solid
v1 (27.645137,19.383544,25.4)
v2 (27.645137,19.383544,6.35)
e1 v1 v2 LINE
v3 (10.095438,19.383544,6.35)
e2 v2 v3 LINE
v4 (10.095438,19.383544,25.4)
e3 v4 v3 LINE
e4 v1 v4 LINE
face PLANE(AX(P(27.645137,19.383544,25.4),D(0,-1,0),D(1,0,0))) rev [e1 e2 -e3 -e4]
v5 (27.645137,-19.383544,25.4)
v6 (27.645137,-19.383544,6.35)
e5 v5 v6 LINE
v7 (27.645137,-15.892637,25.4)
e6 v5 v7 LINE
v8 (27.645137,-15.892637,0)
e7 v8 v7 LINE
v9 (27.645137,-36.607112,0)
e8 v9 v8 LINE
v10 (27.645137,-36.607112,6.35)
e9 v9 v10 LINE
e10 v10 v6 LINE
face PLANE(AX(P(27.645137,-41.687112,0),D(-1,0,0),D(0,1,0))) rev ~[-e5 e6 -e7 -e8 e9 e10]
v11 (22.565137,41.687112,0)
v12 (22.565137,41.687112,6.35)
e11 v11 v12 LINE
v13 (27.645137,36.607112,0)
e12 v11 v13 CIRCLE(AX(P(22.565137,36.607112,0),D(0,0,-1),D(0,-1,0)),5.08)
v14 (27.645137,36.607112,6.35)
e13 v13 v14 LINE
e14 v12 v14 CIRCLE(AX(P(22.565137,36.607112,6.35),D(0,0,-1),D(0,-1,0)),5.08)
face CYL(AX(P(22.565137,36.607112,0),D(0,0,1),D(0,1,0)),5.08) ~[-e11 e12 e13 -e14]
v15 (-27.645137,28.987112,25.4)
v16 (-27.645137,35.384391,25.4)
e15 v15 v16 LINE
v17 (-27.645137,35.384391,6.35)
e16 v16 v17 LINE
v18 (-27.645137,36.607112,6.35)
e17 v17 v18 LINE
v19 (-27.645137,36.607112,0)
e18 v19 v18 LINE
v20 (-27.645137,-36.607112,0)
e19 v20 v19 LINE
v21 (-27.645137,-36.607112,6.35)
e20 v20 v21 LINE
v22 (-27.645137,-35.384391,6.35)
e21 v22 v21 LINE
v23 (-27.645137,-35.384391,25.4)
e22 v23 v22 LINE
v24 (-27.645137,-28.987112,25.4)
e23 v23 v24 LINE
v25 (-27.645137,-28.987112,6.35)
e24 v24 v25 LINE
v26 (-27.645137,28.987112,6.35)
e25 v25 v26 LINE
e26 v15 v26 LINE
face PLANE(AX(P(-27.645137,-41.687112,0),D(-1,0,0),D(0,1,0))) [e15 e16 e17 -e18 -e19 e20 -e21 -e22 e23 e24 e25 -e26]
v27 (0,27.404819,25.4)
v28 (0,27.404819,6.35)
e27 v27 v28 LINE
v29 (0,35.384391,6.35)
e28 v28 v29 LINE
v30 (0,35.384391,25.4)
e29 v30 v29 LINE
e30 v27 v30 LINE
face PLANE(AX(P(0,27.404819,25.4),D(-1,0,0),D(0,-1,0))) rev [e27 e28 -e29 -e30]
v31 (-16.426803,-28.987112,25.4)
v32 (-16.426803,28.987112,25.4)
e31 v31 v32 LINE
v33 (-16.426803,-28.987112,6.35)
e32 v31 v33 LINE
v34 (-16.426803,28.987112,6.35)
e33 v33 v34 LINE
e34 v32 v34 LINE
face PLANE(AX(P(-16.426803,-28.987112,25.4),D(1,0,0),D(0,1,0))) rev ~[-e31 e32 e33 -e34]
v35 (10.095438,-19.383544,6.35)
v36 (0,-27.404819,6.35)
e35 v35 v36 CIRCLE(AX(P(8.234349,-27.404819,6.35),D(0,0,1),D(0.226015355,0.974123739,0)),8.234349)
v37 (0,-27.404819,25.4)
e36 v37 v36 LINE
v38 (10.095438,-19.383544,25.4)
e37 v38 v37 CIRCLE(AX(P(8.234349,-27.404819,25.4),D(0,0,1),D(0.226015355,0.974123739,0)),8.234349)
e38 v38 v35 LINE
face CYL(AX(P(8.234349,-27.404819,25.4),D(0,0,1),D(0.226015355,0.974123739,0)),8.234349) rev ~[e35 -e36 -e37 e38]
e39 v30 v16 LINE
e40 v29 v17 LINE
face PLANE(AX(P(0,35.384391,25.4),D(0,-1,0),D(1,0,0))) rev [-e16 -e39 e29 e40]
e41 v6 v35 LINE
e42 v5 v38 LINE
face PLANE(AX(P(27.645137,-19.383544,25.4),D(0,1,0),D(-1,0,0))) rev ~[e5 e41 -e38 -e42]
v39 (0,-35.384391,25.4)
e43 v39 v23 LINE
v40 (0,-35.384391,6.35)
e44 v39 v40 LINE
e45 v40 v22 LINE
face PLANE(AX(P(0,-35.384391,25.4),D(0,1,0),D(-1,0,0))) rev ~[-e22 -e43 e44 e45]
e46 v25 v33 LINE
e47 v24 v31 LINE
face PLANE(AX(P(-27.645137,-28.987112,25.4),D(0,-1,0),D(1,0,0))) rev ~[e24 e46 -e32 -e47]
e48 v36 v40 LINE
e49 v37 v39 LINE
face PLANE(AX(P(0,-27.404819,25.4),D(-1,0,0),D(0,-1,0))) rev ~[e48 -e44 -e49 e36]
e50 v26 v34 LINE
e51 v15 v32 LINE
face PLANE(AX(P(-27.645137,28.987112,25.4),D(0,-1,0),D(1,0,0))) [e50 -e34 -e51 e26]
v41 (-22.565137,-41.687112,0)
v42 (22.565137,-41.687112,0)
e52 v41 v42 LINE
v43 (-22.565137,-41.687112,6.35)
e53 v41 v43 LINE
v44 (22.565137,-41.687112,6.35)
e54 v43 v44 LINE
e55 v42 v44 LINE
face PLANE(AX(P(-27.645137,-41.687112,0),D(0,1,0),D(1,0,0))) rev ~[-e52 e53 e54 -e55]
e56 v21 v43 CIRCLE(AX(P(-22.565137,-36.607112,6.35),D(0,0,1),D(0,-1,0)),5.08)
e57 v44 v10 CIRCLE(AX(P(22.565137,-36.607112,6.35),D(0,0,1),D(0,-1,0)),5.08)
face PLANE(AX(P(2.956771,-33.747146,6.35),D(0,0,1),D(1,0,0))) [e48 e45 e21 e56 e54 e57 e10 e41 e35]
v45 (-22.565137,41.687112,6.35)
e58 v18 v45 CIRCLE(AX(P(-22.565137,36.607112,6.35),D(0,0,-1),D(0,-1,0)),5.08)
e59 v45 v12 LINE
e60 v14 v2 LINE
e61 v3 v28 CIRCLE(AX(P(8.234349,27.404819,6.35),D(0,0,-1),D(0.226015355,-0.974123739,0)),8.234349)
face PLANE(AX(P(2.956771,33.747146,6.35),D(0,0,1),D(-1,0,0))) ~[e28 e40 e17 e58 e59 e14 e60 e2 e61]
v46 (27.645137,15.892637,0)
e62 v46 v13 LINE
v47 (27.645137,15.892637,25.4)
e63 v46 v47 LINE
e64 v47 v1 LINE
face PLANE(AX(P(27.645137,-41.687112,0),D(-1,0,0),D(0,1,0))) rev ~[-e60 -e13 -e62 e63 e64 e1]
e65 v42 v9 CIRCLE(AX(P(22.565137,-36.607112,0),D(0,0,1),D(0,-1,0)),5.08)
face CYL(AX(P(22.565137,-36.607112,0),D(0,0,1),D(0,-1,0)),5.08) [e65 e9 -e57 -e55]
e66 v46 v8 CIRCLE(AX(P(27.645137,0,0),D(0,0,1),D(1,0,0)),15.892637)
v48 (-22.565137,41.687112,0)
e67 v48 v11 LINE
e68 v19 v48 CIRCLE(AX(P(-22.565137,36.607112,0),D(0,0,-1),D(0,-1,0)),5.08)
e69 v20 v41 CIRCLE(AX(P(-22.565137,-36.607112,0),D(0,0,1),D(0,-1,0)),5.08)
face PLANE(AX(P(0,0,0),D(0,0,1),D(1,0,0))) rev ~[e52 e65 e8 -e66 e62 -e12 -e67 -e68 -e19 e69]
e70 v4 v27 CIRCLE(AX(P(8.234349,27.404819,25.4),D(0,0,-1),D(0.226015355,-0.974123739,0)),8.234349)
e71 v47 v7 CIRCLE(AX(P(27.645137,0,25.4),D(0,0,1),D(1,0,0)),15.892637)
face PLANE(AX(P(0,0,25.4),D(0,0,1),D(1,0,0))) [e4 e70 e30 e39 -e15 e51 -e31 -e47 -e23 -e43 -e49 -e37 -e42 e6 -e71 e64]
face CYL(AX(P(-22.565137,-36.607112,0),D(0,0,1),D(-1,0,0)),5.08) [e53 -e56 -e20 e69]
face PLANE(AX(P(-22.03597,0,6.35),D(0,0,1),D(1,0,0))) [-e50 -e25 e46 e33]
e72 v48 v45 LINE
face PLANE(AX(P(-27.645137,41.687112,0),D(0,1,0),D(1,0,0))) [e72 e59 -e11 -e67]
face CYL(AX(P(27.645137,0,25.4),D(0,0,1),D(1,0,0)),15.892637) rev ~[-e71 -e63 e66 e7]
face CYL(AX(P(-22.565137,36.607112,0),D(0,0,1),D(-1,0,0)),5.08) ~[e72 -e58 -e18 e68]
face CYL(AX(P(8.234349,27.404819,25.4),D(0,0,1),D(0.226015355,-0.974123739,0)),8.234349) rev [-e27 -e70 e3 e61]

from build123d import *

# Parameters (mm, degrees)
F0_W     = 55.290274322
F0_H     = 83.3742246032
F1_DEPTH = 25.4
F2_R     = 15.8926372782
F3_DEPTH = 25.401
F4_W     = 11.2183341355
F4_H     = 57.9742246032
F5_DEPTH = 19.05
F7_DEPTH = 19.05
F8_R     = 5.08


# Not quite as in the source:
# - a pattern or mirror of a feature is missing from the dataset's text; its kind, count and spacing are read off the source's solid


with BuildPart() as f1:
    # F0 (on Top) → F1 (new body)
    with BuildSketch(Plane.XY):
        Rectangle(F0_W, F0_H)
    extrude(amount=F1_DEPTH)

    # F2 (on face) → F3 (cut, through all)
    with BuildSketch(Plane.XY.offset(25.4)):
        with Locations((27.645137161, 0)):
            Circle(F2_R)
    extrude(amount=-F3_DEPTH, mode=Mode.SUBTRACT)

    # F4 (on face) → F5 (cut)
    with BuildSketch(Plane.XY.offset(25.4)):
        with Locations((-22.0359700932, 0)):
            Rectangle(F4_W, F4_H)
    extrude(amount=-F5_DEPTH, mode=Mode.SUBTRACT)

    # F6 (on face) → F7 (cut)
    with BuildSketch(Plane.XY.offset(25.4)):
        with BuildLine():
            Line((27.645137161, -41.6871123016), (27.645137161, -19.3835441023))
            Line((27.645137161, -19.3835441023), (10.0954379886, -19.3835441023))
            ThreePointArc((10.0954379886, -19.3835441023), (3.1118668584, -20.9577512479), (0, -27.4048186839))
            Line((0, -27.4048186839), (0, -35.3843905032))
            Line((0, -35.3843905032), (-27.645137161, -35.3843905032))
            Line((-27.645137161, -35.3843905032), (-27.645137161, -41.6871123016))
            Line((-27.645137161, -41.6871123016), (27.645137161, -41.6871123016))
        make_face()
    f7 = extrude(amount=-F7_DEPTH, mode=Mode.SUBTRACT)

    # F7_copies: F7 across plane
    add(f7.mirror(Plane.ZX), mode=Mode.SUBTRACT)

    # F8
    f8_edges = [f1.edges().sort_by_distance(p)[0] for p in [
        (27.645137, -41.687112, 3.175),
        (27.645137, 41.687112, 3.175),
        (-27.645137, 41.687112, 3.175),
        (-27.645137, -41.687112, 3.175),
    ]]
    fillet(f8_edges, radius=F8_R)


solid = f1.part
